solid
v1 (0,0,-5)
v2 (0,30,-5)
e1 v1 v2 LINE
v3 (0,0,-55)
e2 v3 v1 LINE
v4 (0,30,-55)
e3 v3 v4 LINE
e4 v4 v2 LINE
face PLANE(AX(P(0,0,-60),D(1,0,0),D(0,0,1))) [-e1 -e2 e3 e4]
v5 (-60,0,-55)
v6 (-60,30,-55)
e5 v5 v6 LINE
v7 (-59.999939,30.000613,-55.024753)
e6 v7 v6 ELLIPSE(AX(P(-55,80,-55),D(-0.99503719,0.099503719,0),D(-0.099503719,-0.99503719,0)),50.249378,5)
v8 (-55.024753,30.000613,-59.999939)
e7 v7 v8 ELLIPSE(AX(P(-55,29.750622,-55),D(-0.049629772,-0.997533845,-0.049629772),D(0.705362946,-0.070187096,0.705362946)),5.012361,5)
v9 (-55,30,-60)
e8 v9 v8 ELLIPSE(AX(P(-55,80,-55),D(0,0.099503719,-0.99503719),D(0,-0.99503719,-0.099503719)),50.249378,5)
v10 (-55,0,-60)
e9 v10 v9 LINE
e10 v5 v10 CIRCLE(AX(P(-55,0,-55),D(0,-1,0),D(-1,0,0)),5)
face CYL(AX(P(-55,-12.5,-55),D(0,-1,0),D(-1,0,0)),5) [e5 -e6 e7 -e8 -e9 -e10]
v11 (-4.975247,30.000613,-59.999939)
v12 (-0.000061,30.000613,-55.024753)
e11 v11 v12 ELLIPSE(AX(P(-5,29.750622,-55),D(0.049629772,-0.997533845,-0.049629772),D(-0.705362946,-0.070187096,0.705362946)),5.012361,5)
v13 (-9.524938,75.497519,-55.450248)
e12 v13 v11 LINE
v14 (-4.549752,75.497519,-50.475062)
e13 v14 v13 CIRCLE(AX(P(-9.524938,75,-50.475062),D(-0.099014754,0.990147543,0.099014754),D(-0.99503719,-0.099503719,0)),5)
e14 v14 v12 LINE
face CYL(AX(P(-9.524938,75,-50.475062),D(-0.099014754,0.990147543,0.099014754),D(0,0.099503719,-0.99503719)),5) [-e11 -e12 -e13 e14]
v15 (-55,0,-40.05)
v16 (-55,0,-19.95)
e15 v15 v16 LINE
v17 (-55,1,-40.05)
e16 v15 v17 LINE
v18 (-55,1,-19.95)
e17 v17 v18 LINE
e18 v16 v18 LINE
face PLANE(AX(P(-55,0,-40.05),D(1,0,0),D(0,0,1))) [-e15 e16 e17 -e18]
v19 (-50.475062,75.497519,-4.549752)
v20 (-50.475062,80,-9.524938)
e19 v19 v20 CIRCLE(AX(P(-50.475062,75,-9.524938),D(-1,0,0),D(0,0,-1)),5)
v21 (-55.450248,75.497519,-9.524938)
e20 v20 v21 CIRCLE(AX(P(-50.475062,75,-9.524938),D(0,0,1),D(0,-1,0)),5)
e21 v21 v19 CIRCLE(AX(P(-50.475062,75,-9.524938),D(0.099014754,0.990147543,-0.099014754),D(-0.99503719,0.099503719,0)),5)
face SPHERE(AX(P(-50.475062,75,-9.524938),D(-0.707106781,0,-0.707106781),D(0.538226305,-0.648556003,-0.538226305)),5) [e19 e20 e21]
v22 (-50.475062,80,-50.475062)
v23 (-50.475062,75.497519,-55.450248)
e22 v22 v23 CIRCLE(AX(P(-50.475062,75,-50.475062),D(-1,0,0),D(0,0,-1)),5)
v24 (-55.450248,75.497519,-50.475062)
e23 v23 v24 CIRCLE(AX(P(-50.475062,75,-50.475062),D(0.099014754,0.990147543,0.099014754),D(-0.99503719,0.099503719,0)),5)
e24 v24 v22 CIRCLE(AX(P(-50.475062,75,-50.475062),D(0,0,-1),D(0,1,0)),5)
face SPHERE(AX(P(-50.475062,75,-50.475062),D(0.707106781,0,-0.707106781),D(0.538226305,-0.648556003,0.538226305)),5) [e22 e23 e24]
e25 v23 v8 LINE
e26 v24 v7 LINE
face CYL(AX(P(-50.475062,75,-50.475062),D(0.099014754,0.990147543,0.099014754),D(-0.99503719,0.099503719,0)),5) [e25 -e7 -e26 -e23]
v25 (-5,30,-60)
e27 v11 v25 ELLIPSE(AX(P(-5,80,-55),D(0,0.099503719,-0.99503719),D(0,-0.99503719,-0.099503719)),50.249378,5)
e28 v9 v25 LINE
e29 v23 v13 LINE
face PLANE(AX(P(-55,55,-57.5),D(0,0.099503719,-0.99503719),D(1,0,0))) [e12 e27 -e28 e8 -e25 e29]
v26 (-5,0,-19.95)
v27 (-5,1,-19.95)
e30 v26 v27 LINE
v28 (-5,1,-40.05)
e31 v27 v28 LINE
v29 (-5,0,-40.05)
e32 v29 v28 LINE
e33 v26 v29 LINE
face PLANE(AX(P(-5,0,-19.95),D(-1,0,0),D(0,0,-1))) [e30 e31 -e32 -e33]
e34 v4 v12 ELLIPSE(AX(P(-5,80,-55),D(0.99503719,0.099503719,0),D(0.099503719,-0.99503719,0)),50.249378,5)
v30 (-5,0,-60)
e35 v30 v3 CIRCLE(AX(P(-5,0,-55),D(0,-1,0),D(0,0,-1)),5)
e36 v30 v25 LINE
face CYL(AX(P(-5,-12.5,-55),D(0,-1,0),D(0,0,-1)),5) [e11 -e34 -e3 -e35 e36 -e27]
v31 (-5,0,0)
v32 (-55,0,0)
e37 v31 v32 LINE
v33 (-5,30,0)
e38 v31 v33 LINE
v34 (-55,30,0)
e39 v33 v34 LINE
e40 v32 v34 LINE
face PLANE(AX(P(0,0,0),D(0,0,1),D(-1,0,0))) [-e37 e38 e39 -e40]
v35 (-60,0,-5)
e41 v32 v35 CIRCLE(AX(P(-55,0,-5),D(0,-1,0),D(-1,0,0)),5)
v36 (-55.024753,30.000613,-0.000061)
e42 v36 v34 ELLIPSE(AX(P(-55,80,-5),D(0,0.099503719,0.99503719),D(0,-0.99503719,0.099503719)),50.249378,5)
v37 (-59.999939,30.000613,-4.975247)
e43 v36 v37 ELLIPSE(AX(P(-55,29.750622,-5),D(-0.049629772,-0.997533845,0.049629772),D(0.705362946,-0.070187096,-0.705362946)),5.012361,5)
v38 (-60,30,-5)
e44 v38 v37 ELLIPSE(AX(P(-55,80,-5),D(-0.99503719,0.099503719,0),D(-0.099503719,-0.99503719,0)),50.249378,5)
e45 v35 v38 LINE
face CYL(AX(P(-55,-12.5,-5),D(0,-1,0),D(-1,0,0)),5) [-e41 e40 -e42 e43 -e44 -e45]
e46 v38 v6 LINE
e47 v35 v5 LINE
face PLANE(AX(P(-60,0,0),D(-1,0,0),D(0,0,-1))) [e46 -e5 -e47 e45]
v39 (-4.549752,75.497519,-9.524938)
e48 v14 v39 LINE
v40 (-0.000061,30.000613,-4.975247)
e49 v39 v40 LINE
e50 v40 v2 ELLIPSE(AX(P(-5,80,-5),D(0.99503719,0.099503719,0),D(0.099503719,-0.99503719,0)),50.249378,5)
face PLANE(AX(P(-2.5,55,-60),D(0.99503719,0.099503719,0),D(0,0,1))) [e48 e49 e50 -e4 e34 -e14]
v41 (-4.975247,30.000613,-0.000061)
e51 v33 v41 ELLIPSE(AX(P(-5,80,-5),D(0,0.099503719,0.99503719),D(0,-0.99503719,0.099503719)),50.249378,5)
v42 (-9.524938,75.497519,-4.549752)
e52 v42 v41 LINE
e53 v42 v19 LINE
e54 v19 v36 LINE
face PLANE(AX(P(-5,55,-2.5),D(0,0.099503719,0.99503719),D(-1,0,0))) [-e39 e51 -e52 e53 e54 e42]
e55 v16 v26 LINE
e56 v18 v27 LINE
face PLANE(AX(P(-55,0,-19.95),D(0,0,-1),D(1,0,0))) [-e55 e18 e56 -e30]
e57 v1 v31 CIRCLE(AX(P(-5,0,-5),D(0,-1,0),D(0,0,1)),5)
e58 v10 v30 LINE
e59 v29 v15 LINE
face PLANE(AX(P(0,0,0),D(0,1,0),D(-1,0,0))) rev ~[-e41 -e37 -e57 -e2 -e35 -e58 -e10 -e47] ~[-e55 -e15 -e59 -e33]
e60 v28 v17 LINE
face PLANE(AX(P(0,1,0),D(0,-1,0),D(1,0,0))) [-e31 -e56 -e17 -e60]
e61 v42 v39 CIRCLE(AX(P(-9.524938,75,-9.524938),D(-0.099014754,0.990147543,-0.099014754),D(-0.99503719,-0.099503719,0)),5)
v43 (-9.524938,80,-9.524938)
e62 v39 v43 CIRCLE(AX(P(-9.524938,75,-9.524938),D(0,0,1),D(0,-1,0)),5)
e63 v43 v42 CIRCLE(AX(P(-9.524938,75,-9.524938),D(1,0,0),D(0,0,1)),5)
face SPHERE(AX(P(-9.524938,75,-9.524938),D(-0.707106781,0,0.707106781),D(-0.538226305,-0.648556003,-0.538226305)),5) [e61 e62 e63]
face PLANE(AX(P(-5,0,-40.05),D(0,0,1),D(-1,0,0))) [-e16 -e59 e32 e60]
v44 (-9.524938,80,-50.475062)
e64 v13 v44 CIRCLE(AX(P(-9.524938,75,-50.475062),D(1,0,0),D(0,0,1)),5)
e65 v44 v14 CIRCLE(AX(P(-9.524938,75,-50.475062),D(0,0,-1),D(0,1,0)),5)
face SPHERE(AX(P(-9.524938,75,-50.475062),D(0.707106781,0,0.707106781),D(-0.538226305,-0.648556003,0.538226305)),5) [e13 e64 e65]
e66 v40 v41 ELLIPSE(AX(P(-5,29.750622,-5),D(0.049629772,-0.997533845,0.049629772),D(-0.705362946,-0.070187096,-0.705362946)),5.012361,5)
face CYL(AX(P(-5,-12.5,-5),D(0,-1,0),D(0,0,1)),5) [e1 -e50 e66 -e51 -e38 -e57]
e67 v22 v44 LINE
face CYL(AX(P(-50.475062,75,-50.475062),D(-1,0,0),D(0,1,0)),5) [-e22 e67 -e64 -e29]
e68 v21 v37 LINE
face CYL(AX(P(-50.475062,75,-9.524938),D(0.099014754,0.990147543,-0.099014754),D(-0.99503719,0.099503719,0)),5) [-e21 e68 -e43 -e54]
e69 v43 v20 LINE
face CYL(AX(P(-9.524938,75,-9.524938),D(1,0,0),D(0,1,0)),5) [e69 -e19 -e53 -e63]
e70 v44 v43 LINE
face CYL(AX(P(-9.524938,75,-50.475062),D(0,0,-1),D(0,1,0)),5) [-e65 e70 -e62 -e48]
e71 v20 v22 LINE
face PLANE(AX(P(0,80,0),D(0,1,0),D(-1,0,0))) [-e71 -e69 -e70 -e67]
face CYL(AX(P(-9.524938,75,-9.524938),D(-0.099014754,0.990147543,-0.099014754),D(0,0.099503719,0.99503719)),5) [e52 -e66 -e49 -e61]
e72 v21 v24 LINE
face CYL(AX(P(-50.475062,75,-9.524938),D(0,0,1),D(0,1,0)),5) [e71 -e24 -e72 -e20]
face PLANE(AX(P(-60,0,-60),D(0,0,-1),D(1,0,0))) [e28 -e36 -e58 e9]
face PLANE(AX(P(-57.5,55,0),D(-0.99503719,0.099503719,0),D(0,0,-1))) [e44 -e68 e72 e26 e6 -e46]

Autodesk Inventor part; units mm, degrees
ref_plane "YZ Plane" through (0, 0, 0) normal (1, 0, 0) x (0, 1, 0)
ref_plane "XZ Plane" through (0, 0, 0) normal (0, 1, 0) x (-1, 0, 0)
ref_plane "XY Plane" through (0, 0, 0) normal (0, 0, 1) x (1, 0, 0)
sketch "スケッチ1" plane through (0, 0, 0) normal (0, 1, 0) x (-1, 0, 0)
  line L0 (0, 0) -> (60, 0)
  line L1 (60, 0) -> (60, -60)
  line L2 (60, -60) -> (0, -60)
  line L3 (0, -60) -> (0, 0)
  dimension "d0" = 60
  dimension "d1" = 60
extrude "押し出し1" add sketch "スケッチ1" along normal blind 80
chamfer "面取り1" distance 5 distance2 50 1 edges at (0, 80, -30) measured on face at (-20, 80, -40)
chamfer "面取り2" distance 5 distance2 50 1 edges at (-60, 80, -30) measured on face at (-23.3333, 80, -40)
chamfer "面取り3" distance 5 distance2 50 1 edges at (-30, 80, -60) measured on face at (-21.6667, 80, -40)
chamfer "面取り4" distance 5 distance2 50 1 edges at (-30, 80, 0) measured on face at (-21.6667, 80, -18.3333)
fillet "フィレット1" radius 5 12 edges at (0, 15, -60) (-60, 15, -60) (-60, 15, 0) (0, 15, 0) (-57.5, 55, -2.5) (-57.5, 55, -57.5) (-55, 80, -30) (-30, 80, -5) (-5, 80, -30) (-30, 80, -55) (-2.5, 55, -2.5) (-2.5, 55, -57.5)
sketch "スケッチ2" plane through (0, 0, 0) normal (0, -1, 0) x (1, 0, 0)
  line L0 (-60, -55) -> (-60, -5) projected
  line L1 (-60, -30) -> (0, -30) construction
  line L2 (0, -5) -> (0, -55) projected
  line L3 (-55, -19.95) -> (-5, -19.95)
  line L4 (-5, -19.95) -> (-5, -40.05)
  line L5 (-5, -40.05) -> (-55, -40.05)
  line L6 (-55, -40.05) -> (-55, -19.95)
  line L7 (-55, -19.95) -> (-5, -40.05) construction
  line L8 (-5, -19.95) -> (-55, -40.05) construction
  point P0 (0, 0)
  point P1 (-30, -30)
  dimension "d17" = 50
  dimension "d18" = 20.1
extrude "押し出し2" cut sketch "スケッチ2" against normal blind 1
properties part number "raida-"
